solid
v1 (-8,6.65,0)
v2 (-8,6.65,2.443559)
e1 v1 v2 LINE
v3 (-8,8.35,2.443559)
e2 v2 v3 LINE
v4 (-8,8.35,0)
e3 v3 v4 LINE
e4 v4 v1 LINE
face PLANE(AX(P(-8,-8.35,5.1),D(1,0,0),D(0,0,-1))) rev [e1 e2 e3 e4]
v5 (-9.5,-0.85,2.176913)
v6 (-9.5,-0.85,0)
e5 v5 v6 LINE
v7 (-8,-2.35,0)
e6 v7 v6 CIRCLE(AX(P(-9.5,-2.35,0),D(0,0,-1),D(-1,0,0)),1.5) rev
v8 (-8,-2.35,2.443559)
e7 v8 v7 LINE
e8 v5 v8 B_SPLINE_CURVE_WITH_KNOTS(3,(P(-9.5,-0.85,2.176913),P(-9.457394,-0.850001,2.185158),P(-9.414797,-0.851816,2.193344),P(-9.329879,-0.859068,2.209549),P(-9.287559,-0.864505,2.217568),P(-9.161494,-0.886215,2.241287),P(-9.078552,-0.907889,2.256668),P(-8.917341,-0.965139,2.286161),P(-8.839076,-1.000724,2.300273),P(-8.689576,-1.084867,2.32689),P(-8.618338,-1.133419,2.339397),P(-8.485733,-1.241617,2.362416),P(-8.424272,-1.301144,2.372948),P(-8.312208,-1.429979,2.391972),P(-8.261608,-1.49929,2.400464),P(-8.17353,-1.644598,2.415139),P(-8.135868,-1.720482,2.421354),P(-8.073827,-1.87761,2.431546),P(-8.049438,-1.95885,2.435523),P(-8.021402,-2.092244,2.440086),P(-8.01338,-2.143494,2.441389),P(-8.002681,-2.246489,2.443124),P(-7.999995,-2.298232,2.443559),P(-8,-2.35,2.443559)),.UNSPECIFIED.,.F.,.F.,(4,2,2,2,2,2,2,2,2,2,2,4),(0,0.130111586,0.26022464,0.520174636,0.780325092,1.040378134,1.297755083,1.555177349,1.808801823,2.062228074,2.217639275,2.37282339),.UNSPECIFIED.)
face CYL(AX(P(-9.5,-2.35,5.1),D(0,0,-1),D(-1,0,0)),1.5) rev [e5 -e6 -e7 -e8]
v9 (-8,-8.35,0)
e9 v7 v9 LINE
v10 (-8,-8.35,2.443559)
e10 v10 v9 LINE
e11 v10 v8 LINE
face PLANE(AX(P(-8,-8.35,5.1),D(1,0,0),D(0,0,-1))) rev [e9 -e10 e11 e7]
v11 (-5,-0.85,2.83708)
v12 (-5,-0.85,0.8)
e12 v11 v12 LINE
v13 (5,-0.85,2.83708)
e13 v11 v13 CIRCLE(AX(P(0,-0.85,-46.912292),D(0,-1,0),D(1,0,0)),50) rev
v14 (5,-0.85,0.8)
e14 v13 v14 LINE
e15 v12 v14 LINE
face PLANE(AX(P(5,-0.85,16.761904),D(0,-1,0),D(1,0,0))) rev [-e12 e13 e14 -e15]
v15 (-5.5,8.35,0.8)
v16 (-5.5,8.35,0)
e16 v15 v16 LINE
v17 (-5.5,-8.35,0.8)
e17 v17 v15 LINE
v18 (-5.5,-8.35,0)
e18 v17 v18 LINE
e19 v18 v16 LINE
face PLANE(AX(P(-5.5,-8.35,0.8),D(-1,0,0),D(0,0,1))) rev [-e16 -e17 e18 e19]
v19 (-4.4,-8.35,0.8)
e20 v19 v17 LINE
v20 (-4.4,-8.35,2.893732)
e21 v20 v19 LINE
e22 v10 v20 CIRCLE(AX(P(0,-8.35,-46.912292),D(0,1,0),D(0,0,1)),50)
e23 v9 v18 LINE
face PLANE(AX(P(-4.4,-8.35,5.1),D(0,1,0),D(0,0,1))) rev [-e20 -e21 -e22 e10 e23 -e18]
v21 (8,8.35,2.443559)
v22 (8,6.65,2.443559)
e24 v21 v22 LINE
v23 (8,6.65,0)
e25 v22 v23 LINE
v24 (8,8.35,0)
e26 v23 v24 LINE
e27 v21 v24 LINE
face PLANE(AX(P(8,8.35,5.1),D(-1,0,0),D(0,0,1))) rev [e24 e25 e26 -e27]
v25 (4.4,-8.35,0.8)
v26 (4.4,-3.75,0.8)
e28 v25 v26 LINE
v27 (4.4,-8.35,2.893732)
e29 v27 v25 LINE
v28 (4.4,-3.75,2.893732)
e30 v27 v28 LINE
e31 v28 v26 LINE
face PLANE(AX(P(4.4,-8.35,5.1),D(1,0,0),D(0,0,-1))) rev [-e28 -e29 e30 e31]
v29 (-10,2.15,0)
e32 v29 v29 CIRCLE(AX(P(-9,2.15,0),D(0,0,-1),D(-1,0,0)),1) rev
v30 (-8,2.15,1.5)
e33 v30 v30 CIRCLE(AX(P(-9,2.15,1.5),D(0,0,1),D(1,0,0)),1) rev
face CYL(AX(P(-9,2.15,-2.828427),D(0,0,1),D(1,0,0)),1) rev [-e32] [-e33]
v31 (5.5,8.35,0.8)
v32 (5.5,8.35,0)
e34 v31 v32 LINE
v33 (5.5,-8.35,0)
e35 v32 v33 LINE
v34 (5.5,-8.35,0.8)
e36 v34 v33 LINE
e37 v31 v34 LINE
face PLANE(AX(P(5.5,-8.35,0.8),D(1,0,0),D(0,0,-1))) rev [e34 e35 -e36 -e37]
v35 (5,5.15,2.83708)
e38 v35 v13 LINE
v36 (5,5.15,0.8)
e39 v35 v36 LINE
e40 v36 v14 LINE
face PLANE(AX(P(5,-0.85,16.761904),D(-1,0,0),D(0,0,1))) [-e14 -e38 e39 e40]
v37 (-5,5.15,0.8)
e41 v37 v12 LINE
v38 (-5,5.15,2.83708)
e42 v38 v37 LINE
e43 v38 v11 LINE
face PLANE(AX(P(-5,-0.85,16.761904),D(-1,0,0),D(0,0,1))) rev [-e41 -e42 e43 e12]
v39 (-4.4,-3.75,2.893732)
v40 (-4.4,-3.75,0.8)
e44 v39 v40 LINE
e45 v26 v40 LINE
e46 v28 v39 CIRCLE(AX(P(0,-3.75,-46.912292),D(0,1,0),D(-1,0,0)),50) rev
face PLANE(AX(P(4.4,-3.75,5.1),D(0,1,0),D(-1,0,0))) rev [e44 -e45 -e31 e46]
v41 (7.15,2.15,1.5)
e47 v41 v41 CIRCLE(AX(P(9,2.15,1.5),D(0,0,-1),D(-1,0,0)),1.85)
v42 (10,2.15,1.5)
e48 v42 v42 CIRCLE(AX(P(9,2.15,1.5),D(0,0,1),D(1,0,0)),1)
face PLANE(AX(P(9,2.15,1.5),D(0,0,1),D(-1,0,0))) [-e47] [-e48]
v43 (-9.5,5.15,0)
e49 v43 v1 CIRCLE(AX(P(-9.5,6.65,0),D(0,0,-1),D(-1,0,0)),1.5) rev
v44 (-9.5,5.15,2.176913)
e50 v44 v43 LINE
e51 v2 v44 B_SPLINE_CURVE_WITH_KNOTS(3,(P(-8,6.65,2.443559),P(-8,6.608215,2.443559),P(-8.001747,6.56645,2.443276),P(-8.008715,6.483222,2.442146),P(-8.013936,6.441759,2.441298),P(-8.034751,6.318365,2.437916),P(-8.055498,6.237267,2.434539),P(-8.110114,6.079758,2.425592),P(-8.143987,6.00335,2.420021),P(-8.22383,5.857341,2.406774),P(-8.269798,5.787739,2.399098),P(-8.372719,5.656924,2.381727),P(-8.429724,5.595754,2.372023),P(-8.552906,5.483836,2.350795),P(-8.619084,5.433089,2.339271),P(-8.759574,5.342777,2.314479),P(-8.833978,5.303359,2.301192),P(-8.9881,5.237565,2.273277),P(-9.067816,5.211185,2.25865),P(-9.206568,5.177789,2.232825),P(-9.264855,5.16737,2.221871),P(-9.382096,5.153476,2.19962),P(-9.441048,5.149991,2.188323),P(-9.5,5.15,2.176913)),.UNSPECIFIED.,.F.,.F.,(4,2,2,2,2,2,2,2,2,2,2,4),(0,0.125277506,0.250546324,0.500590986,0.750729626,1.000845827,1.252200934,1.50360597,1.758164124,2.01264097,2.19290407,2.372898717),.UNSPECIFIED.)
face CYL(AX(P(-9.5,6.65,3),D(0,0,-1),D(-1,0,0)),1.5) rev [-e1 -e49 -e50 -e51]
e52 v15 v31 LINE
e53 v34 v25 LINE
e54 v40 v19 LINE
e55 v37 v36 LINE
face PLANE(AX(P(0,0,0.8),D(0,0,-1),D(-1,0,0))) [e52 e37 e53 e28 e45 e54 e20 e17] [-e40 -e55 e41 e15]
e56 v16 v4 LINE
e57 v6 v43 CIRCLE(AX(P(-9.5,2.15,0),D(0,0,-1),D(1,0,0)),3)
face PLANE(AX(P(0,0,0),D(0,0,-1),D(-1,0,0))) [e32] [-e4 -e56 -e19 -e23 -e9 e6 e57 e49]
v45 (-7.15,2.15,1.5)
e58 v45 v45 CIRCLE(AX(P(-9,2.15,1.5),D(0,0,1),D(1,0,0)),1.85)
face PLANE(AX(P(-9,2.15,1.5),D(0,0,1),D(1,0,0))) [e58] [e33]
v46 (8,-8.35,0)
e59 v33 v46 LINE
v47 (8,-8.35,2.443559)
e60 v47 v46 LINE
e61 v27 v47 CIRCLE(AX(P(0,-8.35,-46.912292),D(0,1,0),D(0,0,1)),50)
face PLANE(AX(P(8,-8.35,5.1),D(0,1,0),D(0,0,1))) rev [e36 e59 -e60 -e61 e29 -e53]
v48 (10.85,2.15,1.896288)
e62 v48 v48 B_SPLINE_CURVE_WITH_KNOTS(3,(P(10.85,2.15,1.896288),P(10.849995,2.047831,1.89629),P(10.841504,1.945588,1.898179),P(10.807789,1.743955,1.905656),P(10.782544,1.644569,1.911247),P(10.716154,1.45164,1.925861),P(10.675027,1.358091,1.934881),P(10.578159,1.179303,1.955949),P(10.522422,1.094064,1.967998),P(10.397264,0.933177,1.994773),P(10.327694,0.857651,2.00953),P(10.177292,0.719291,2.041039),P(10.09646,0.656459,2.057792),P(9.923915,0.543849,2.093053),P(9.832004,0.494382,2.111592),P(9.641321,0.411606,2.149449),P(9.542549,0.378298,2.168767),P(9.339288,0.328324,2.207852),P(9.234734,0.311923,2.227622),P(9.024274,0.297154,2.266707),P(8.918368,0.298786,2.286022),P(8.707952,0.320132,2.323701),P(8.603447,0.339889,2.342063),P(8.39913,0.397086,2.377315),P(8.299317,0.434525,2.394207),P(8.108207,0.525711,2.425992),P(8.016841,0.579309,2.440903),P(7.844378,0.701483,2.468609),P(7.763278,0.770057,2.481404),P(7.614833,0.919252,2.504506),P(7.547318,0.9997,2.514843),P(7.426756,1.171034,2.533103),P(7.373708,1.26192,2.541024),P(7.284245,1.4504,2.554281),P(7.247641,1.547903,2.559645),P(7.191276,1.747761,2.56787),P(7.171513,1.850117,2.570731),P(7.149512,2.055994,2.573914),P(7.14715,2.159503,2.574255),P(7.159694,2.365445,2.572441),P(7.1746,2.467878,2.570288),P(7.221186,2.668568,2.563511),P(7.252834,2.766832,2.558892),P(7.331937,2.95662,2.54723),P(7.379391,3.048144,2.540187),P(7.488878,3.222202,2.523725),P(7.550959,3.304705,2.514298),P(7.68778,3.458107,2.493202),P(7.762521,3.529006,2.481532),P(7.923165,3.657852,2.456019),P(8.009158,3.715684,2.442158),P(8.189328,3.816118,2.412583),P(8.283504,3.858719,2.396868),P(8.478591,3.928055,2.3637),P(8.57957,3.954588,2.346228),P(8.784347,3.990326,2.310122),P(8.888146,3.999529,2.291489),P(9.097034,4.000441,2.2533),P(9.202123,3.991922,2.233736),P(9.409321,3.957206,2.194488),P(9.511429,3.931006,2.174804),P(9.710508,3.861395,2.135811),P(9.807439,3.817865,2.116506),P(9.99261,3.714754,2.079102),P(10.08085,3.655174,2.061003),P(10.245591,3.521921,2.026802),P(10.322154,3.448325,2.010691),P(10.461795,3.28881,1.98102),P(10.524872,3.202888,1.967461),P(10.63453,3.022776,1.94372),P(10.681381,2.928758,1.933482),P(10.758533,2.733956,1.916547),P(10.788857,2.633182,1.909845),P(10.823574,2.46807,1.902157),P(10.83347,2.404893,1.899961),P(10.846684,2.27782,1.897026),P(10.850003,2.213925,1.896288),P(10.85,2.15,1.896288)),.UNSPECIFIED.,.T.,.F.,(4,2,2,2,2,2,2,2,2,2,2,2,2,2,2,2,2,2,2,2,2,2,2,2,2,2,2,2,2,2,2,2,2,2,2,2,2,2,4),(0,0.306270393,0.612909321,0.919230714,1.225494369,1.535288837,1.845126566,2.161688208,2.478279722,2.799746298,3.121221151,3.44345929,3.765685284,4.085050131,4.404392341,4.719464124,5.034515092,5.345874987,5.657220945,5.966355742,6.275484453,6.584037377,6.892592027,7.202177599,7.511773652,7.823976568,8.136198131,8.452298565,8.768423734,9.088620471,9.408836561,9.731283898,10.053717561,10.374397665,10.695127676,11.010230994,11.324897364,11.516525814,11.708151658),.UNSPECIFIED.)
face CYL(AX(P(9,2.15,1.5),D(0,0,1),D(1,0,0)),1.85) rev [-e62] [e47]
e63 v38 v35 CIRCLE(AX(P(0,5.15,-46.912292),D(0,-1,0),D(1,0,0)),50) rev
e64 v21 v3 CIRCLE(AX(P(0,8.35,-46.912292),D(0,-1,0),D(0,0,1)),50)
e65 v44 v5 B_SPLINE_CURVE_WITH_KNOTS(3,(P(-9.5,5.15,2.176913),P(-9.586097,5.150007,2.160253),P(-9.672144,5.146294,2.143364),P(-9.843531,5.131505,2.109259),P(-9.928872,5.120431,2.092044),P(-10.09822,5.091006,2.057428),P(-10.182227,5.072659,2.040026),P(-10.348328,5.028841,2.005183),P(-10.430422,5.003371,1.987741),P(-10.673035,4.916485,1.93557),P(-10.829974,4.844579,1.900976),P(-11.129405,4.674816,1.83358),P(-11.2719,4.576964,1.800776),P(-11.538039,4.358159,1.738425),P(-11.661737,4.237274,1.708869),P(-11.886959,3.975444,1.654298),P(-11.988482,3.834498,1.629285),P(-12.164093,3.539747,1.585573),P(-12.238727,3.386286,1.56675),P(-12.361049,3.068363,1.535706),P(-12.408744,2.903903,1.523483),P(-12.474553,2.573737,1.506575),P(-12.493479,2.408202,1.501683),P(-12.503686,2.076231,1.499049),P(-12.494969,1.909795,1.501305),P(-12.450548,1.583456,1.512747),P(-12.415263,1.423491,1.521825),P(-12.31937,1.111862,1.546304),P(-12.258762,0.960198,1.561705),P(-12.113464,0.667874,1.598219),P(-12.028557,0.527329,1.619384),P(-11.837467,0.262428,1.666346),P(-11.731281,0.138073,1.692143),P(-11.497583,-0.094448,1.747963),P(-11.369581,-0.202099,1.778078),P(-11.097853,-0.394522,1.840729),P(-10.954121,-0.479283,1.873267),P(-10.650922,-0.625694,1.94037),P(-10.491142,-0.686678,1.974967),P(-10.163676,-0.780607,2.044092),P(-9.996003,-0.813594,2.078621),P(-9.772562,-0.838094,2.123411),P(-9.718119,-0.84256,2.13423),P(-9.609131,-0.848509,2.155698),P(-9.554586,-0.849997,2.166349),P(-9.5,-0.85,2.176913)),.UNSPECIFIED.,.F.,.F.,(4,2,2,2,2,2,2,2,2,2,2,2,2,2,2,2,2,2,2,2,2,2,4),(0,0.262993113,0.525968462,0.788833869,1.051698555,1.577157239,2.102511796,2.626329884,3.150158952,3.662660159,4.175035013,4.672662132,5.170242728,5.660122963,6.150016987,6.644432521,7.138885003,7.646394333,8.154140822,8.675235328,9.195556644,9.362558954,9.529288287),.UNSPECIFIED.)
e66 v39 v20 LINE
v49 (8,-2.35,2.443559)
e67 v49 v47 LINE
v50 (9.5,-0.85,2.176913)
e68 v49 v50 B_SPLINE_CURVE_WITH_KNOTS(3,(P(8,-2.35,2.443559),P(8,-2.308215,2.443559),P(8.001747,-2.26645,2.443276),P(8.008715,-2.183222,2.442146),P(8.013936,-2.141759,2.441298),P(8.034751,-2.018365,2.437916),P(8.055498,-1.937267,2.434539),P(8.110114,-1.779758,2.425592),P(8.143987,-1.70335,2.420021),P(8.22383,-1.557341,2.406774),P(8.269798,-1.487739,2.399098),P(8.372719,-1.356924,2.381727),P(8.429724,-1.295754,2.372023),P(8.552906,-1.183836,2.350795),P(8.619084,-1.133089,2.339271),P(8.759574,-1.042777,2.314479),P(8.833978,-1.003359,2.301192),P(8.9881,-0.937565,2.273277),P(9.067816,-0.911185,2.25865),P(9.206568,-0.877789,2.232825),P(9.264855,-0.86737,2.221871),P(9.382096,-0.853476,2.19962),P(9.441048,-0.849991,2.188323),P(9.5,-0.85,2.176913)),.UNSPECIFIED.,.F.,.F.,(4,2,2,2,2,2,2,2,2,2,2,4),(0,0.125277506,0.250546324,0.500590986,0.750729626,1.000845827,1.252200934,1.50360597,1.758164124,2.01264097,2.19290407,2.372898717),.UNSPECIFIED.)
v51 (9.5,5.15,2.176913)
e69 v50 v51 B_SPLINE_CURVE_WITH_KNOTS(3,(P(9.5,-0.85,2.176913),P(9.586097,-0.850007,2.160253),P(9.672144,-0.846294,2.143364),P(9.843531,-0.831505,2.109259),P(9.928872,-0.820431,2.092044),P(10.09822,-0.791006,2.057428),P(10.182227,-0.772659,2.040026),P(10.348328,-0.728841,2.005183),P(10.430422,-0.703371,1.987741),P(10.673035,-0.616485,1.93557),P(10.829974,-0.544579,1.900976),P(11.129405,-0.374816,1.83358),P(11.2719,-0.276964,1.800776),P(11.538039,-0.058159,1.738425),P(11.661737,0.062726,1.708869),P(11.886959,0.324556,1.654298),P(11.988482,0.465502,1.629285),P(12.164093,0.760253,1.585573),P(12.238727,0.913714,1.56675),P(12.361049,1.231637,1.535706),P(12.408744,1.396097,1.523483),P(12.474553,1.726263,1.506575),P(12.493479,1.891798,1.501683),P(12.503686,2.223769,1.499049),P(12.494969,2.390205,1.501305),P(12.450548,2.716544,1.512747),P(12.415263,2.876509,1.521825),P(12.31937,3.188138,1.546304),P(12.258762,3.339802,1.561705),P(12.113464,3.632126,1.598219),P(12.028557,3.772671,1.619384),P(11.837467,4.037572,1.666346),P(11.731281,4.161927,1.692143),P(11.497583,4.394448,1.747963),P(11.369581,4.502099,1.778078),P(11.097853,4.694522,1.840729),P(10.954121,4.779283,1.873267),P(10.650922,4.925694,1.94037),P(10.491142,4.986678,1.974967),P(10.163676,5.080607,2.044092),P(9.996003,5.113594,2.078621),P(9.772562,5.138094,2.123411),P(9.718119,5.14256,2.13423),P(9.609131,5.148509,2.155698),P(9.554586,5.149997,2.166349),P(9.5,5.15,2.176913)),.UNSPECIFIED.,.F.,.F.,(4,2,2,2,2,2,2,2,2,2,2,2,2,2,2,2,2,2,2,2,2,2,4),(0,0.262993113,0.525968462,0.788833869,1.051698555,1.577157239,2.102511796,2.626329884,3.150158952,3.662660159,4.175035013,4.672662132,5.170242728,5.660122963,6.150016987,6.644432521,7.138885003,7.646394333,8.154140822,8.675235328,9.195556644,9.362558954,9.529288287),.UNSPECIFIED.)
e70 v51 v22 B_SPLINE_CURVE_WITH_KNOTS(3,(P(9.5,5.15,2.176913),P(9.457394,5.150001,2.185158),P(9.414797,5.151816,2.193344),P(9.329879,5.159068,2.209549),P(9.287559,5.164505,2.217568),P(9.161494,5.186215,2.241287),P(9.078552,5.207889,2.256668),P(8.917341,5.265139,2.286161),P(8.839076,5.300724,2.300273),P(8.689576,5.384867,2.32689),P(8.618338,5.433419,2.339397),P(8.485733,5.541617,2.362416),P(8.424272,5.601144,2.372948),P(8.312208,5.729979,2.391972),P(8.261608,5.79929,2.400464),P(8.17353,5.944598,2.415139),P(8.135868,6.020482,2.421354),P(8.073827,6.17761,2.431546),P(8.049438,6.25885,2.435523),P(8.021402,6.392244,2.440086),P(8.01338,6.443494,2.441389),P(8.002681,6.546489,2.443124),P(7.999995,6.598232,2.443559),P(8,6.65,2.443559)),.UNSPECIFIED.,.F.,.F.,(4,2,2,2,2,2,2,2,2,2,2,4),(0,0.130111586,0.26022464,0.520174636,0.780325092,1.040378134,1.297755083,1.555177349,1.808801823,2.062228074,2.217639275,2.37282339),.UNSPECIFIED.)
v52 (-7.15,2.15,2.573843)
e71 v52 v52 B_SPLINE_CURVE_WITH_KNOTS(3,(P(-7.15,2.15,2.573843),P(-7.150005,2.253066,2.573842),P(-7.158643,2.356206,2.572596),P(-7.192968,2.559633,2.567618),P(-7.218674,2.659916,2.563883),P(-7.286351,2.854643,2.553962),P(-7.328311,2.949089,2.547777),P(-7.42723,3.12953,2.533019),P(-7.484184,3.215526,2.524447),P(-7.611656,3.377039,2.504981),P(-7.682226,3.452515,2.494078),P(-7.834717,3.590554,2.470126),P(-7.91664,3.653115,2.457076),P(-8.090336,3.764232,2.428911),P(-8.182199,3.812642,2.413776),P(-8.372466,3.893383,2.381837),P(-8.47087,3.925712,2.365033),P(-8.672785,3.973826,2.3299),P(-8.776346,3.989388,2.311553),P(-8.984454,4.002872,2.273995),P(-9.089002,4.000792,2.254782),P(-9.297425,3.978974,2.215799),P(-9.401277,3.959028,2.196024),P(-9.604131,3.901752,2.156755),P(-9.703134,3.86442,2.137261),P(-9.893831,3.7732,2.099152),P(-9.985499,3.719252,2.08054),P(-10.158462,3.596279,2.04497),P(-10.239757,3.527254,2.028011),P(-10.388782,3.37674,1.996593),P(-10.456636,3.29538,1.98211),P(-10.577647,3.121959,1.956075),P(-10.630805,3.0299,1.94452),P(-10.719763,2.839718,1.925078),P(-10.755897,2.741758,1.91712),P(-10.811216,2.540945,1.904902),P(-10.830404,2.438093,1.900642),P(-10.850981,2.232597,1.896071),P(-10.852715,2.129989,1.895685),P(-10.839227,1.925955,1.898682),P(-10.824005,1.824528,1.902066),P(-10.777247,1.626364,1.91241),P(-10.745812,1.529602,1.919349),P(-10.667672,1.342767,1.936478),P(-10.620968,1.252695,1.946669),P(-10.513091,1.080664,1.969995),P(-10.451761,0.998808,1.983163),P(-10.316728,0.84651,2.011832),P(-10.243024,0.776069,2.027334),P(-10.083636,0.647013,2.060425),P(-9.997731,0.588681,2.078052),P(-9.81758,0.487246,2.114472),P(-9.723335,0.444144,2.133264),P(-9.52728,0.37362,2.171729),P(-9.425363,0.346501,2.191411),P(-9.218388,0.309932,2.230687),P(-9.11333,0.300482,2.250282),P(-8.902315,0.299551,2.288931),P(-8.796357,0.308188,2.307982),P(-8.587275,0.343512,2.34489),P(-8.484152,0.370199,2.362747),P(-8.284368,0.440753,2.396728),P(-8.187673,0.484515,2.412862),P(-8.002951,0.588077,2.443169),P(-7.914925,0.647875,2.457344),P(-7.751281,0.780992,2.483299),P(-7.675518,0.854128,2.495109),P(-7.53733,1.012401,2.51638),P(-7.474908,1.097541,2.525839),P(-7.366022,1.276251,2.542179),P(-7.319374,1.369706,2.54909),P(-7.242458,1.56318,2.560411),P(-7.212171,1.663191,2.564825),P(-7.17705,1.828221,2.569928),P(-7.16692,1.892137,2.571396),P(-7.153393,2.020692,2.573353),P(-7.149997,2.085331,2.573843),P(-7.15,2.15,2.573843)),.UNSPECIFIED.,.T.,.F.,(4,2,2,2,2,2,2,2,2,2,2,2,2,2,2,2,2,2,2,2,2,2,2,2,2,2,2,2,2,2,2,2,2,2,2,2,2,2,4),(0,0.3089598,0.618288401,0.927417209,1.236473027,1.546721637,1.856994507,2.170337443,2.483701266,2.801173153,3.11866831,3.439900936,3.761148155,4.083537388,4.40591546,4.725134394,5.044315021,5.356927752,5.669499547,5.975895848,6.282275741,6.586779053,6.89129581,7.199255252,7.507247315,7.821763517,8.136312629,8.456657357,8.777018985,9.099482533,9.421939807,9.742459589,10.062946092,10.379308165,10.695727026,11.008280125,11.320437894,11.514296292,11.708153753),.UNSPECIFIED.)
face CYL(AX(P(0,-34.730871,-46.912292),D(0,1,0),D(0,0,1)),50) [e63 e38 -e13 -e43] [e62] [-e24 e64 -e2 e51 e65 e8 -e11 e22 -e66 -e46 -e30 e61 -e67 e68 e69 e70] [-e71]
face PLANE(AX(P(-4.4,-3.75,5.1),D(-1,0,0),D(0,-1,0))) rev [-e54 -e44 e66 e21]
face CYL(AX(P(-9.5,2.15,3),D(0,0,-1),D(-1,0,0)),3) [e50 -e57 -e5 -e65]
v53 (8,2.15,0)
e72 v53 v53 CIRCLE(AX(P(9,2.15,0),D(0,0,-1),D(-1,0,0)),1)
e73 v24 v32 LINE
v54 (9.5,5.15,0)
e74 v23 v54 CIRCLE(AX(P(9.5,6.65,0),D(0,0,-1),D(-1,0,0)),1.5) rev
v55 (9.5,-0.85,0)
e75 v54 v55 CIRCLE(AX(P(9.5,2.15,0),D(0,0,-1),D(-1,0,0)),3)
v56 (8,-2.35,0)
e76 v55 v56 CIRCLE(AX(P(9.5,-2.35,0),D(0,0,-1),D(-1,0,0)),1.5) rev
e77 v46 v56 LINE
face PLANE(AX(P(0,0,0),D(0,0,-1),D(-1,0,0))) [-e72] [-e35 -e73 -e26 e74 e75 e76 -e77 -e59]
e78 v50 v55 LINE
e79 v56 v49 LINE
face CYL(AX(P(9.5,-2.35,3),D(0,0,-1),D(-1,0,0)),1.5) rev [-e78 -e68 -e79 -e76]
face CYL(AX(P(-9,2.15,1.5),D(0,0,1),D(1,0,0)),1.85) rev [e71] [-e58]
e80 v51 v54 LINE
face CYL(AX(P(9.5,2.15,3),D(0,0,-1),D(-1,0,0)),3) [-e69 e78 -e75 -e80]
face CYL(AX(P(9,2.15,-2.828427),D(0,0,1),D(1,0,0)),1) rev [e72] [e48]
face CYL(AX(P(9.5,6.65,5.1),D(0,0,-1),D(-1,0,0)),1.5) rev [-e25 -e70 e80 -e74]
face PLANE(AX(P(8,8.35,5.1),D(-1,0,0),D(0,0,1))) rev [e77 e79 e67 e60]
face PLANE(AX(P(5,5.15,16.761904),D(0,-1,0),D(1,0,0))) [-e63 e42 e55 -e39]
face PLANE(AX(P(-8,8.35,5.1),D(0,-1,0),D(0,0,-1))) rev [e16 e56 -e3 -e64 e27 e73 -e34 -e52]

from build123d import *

# Parameters (mm, degrees)
MAIN_DEPTH               = 5.1
SKETCH1_W                = 10
SKETCH1_H                = 6
SENSOR_CUT_DEPTH         = 5.1
MOUNTING_EARS_DEPTH      = 3
SKETCH4_R                = 1
MOUNT_HOLES_DEPTH        = 3
SKETCH9_R                = 1.85
CUT_EXTRUDE1_DEPTH       = 1.5
CIRCULAR_FRONT_CUT_REACH = 23.474
SKETCH6_W                = 11
SKETCH6_H                = 16.7
PCB_CUT_DEPTH            = 0.8
FILLET3_R                = 1.5


with BuildPart() as part:
    # Sketch2 → main (new body)
    with BuildSketch(Plane.XY):
        Polygon((-4.4, -8.35), (-8, -8.35), (-8, 8.35), (8, 8.35), (8, -8.35), (4.4, -8.35), (4.4, -3.75), (-4.4, -3.75), align=None)
    extrude(amount=MAIN_DEPTH)

    # Sketch1 → sensor_cut (cut)
    with BuildSketch(Plane.XY):
        with Locations((0, 2.15)):
            Rectangle(SKETCH1_W, SKETCH1_H)
    extrude(amount=SENSOR_CUT_DEPTH, mode=Mode.SUBTRACT)

    # Sketch3 → mounting_ears (add)
    with BuildSketch(Plane(origin=(0, 0, 0), x_dir=(-1, 0, 0), z_dir=(0, 0, -1))):
        with BuildLine():
            Line((9.5, -0.85), (8, -0.85))
            Line((8, -0.85), (8, 5.15))
            Line((8, 5.15), (9.5, 5.15))
            ThreePointArc((9.5, 5.15), (12.5, 2.15), (9.5, -0.85))
        make_face()
        with BuildLine():
            Line((-8, 5.15), (-9.5, 5.15))
            ThreePointArc((-9.5, 5.15), (-12.5, 2.15), (-9.5, -0.85))
            Line((-9.5, -0.85), (-8, -0.85))
            Line((-8, -0.85), (-8, 5.15))
        make_face()
    extrude(amount=-MOUNTING_EARS_DEPTH)

    # Sketch4 → mount_holes (cut)
    with BuildSketch(Plane.XY.offset(3)):
        with Locations((-9, 2.15)):
            Circle(SKETCH4_R)
    mount_holes = extrude(amount=-MOUNT_HOLES_DEPTH, mode=Mode.SUBTRACT)

    # Sketch9 → Cut-Extrude1 (cut)
    with BuildSketch(Plane.XY.offset(3)):
        with Locations((-9, 2.15)):
            Circle(SKETCH9_R)
    cut_extrude1 = extrude(amount=-CUT_EXTRUDE1_DEPTH, mode=Mode.SUBTRACT)

    # Mirror1: mount_holes, Cut-Extrude1 across plane
    add(mount_holes.mirror(Plane(origin=(0, 0, 0), x_dir=(0, 0, 1), z_dir=(1, 0, 0))), mode=Mode.SUBTRACT)
    add(cut_extrude1.mirror(Plane(origin=(0, 0, 0), x_dir=(0, 0, 1), z_dir=(1, 0, 0))), mode=Mode.SUBTRACT)

    # circular_front_cut: up to this face of the body (flat: up to its plane)
    circular_front_cut_end = Plane(part.part.faces().sort_by_distance((-6.2, -8.35, 2.55))[0])
    # Sketch5 → circular_front_cut (cut, up to the picked face)
    with BuildSketch(Plane(origin=(0, 8.35, 0), x_dir=(1, 0, 0), z_dir=(0, 1, 0)), mode=Mode.PRIVATE) as circular_front_cut_sk1:
        with BuildLine():
            Line((-12.5, -1.5), (-12.5, -9.92320486))
            Line((-12.5, -9.92320486), (12.5, -9.92320486))
            Line((12.5, -9.92320486), (12.5, -1.5))
            ThreePointArc((12.5, -1.5), (0, -3.087708172), (-12.5, -1.5))
        make_face()
    circular_front_cut_tool1 = split(extrude(circular_front_cut_sk1.sketch, amount=-CIRCULAR_FRONT_CUT_REACH, mode=Mode.PRIVATE), bisect_by=circular_front_cut_end, keep=Keep.BOTH, mode=Mode.PRIVATE)
    add(circular_front_cut_tool1.solids().sort_by(Axis((0, 8.35, 6.227394), (0, -1, 0)))[0], mode=Mode.SUBTRACT)

    # Sketch6 → pcb_cut (cut)
    with BuildSketch(Plane(origin=(0, 0, 0), x_dir=(-1, 0, 0), z_dir=(0, 0, -1))):
        Rectangle(SKETCH6_W, SKETCH6_H)
    extrude(amount=-PCB_CUT_DEPTH, mode=Mode.SUBTRACT)

    # Fillet3
    fillet3_edges = [part.edges().sort_by_distance(p)[0] for p in [
        (-8, -0.85, 1.221779445),
        (-8, 5.15, 1.221779445),
        (8, 5.15, 1.221779445),
        (8, -0.85, 1.221779445),
    ]]
    fillet(fillet3_edges, radius=FILLET3_R - 0.0001)  # a hair under: the kernel refuses the full size


solid = part.part
